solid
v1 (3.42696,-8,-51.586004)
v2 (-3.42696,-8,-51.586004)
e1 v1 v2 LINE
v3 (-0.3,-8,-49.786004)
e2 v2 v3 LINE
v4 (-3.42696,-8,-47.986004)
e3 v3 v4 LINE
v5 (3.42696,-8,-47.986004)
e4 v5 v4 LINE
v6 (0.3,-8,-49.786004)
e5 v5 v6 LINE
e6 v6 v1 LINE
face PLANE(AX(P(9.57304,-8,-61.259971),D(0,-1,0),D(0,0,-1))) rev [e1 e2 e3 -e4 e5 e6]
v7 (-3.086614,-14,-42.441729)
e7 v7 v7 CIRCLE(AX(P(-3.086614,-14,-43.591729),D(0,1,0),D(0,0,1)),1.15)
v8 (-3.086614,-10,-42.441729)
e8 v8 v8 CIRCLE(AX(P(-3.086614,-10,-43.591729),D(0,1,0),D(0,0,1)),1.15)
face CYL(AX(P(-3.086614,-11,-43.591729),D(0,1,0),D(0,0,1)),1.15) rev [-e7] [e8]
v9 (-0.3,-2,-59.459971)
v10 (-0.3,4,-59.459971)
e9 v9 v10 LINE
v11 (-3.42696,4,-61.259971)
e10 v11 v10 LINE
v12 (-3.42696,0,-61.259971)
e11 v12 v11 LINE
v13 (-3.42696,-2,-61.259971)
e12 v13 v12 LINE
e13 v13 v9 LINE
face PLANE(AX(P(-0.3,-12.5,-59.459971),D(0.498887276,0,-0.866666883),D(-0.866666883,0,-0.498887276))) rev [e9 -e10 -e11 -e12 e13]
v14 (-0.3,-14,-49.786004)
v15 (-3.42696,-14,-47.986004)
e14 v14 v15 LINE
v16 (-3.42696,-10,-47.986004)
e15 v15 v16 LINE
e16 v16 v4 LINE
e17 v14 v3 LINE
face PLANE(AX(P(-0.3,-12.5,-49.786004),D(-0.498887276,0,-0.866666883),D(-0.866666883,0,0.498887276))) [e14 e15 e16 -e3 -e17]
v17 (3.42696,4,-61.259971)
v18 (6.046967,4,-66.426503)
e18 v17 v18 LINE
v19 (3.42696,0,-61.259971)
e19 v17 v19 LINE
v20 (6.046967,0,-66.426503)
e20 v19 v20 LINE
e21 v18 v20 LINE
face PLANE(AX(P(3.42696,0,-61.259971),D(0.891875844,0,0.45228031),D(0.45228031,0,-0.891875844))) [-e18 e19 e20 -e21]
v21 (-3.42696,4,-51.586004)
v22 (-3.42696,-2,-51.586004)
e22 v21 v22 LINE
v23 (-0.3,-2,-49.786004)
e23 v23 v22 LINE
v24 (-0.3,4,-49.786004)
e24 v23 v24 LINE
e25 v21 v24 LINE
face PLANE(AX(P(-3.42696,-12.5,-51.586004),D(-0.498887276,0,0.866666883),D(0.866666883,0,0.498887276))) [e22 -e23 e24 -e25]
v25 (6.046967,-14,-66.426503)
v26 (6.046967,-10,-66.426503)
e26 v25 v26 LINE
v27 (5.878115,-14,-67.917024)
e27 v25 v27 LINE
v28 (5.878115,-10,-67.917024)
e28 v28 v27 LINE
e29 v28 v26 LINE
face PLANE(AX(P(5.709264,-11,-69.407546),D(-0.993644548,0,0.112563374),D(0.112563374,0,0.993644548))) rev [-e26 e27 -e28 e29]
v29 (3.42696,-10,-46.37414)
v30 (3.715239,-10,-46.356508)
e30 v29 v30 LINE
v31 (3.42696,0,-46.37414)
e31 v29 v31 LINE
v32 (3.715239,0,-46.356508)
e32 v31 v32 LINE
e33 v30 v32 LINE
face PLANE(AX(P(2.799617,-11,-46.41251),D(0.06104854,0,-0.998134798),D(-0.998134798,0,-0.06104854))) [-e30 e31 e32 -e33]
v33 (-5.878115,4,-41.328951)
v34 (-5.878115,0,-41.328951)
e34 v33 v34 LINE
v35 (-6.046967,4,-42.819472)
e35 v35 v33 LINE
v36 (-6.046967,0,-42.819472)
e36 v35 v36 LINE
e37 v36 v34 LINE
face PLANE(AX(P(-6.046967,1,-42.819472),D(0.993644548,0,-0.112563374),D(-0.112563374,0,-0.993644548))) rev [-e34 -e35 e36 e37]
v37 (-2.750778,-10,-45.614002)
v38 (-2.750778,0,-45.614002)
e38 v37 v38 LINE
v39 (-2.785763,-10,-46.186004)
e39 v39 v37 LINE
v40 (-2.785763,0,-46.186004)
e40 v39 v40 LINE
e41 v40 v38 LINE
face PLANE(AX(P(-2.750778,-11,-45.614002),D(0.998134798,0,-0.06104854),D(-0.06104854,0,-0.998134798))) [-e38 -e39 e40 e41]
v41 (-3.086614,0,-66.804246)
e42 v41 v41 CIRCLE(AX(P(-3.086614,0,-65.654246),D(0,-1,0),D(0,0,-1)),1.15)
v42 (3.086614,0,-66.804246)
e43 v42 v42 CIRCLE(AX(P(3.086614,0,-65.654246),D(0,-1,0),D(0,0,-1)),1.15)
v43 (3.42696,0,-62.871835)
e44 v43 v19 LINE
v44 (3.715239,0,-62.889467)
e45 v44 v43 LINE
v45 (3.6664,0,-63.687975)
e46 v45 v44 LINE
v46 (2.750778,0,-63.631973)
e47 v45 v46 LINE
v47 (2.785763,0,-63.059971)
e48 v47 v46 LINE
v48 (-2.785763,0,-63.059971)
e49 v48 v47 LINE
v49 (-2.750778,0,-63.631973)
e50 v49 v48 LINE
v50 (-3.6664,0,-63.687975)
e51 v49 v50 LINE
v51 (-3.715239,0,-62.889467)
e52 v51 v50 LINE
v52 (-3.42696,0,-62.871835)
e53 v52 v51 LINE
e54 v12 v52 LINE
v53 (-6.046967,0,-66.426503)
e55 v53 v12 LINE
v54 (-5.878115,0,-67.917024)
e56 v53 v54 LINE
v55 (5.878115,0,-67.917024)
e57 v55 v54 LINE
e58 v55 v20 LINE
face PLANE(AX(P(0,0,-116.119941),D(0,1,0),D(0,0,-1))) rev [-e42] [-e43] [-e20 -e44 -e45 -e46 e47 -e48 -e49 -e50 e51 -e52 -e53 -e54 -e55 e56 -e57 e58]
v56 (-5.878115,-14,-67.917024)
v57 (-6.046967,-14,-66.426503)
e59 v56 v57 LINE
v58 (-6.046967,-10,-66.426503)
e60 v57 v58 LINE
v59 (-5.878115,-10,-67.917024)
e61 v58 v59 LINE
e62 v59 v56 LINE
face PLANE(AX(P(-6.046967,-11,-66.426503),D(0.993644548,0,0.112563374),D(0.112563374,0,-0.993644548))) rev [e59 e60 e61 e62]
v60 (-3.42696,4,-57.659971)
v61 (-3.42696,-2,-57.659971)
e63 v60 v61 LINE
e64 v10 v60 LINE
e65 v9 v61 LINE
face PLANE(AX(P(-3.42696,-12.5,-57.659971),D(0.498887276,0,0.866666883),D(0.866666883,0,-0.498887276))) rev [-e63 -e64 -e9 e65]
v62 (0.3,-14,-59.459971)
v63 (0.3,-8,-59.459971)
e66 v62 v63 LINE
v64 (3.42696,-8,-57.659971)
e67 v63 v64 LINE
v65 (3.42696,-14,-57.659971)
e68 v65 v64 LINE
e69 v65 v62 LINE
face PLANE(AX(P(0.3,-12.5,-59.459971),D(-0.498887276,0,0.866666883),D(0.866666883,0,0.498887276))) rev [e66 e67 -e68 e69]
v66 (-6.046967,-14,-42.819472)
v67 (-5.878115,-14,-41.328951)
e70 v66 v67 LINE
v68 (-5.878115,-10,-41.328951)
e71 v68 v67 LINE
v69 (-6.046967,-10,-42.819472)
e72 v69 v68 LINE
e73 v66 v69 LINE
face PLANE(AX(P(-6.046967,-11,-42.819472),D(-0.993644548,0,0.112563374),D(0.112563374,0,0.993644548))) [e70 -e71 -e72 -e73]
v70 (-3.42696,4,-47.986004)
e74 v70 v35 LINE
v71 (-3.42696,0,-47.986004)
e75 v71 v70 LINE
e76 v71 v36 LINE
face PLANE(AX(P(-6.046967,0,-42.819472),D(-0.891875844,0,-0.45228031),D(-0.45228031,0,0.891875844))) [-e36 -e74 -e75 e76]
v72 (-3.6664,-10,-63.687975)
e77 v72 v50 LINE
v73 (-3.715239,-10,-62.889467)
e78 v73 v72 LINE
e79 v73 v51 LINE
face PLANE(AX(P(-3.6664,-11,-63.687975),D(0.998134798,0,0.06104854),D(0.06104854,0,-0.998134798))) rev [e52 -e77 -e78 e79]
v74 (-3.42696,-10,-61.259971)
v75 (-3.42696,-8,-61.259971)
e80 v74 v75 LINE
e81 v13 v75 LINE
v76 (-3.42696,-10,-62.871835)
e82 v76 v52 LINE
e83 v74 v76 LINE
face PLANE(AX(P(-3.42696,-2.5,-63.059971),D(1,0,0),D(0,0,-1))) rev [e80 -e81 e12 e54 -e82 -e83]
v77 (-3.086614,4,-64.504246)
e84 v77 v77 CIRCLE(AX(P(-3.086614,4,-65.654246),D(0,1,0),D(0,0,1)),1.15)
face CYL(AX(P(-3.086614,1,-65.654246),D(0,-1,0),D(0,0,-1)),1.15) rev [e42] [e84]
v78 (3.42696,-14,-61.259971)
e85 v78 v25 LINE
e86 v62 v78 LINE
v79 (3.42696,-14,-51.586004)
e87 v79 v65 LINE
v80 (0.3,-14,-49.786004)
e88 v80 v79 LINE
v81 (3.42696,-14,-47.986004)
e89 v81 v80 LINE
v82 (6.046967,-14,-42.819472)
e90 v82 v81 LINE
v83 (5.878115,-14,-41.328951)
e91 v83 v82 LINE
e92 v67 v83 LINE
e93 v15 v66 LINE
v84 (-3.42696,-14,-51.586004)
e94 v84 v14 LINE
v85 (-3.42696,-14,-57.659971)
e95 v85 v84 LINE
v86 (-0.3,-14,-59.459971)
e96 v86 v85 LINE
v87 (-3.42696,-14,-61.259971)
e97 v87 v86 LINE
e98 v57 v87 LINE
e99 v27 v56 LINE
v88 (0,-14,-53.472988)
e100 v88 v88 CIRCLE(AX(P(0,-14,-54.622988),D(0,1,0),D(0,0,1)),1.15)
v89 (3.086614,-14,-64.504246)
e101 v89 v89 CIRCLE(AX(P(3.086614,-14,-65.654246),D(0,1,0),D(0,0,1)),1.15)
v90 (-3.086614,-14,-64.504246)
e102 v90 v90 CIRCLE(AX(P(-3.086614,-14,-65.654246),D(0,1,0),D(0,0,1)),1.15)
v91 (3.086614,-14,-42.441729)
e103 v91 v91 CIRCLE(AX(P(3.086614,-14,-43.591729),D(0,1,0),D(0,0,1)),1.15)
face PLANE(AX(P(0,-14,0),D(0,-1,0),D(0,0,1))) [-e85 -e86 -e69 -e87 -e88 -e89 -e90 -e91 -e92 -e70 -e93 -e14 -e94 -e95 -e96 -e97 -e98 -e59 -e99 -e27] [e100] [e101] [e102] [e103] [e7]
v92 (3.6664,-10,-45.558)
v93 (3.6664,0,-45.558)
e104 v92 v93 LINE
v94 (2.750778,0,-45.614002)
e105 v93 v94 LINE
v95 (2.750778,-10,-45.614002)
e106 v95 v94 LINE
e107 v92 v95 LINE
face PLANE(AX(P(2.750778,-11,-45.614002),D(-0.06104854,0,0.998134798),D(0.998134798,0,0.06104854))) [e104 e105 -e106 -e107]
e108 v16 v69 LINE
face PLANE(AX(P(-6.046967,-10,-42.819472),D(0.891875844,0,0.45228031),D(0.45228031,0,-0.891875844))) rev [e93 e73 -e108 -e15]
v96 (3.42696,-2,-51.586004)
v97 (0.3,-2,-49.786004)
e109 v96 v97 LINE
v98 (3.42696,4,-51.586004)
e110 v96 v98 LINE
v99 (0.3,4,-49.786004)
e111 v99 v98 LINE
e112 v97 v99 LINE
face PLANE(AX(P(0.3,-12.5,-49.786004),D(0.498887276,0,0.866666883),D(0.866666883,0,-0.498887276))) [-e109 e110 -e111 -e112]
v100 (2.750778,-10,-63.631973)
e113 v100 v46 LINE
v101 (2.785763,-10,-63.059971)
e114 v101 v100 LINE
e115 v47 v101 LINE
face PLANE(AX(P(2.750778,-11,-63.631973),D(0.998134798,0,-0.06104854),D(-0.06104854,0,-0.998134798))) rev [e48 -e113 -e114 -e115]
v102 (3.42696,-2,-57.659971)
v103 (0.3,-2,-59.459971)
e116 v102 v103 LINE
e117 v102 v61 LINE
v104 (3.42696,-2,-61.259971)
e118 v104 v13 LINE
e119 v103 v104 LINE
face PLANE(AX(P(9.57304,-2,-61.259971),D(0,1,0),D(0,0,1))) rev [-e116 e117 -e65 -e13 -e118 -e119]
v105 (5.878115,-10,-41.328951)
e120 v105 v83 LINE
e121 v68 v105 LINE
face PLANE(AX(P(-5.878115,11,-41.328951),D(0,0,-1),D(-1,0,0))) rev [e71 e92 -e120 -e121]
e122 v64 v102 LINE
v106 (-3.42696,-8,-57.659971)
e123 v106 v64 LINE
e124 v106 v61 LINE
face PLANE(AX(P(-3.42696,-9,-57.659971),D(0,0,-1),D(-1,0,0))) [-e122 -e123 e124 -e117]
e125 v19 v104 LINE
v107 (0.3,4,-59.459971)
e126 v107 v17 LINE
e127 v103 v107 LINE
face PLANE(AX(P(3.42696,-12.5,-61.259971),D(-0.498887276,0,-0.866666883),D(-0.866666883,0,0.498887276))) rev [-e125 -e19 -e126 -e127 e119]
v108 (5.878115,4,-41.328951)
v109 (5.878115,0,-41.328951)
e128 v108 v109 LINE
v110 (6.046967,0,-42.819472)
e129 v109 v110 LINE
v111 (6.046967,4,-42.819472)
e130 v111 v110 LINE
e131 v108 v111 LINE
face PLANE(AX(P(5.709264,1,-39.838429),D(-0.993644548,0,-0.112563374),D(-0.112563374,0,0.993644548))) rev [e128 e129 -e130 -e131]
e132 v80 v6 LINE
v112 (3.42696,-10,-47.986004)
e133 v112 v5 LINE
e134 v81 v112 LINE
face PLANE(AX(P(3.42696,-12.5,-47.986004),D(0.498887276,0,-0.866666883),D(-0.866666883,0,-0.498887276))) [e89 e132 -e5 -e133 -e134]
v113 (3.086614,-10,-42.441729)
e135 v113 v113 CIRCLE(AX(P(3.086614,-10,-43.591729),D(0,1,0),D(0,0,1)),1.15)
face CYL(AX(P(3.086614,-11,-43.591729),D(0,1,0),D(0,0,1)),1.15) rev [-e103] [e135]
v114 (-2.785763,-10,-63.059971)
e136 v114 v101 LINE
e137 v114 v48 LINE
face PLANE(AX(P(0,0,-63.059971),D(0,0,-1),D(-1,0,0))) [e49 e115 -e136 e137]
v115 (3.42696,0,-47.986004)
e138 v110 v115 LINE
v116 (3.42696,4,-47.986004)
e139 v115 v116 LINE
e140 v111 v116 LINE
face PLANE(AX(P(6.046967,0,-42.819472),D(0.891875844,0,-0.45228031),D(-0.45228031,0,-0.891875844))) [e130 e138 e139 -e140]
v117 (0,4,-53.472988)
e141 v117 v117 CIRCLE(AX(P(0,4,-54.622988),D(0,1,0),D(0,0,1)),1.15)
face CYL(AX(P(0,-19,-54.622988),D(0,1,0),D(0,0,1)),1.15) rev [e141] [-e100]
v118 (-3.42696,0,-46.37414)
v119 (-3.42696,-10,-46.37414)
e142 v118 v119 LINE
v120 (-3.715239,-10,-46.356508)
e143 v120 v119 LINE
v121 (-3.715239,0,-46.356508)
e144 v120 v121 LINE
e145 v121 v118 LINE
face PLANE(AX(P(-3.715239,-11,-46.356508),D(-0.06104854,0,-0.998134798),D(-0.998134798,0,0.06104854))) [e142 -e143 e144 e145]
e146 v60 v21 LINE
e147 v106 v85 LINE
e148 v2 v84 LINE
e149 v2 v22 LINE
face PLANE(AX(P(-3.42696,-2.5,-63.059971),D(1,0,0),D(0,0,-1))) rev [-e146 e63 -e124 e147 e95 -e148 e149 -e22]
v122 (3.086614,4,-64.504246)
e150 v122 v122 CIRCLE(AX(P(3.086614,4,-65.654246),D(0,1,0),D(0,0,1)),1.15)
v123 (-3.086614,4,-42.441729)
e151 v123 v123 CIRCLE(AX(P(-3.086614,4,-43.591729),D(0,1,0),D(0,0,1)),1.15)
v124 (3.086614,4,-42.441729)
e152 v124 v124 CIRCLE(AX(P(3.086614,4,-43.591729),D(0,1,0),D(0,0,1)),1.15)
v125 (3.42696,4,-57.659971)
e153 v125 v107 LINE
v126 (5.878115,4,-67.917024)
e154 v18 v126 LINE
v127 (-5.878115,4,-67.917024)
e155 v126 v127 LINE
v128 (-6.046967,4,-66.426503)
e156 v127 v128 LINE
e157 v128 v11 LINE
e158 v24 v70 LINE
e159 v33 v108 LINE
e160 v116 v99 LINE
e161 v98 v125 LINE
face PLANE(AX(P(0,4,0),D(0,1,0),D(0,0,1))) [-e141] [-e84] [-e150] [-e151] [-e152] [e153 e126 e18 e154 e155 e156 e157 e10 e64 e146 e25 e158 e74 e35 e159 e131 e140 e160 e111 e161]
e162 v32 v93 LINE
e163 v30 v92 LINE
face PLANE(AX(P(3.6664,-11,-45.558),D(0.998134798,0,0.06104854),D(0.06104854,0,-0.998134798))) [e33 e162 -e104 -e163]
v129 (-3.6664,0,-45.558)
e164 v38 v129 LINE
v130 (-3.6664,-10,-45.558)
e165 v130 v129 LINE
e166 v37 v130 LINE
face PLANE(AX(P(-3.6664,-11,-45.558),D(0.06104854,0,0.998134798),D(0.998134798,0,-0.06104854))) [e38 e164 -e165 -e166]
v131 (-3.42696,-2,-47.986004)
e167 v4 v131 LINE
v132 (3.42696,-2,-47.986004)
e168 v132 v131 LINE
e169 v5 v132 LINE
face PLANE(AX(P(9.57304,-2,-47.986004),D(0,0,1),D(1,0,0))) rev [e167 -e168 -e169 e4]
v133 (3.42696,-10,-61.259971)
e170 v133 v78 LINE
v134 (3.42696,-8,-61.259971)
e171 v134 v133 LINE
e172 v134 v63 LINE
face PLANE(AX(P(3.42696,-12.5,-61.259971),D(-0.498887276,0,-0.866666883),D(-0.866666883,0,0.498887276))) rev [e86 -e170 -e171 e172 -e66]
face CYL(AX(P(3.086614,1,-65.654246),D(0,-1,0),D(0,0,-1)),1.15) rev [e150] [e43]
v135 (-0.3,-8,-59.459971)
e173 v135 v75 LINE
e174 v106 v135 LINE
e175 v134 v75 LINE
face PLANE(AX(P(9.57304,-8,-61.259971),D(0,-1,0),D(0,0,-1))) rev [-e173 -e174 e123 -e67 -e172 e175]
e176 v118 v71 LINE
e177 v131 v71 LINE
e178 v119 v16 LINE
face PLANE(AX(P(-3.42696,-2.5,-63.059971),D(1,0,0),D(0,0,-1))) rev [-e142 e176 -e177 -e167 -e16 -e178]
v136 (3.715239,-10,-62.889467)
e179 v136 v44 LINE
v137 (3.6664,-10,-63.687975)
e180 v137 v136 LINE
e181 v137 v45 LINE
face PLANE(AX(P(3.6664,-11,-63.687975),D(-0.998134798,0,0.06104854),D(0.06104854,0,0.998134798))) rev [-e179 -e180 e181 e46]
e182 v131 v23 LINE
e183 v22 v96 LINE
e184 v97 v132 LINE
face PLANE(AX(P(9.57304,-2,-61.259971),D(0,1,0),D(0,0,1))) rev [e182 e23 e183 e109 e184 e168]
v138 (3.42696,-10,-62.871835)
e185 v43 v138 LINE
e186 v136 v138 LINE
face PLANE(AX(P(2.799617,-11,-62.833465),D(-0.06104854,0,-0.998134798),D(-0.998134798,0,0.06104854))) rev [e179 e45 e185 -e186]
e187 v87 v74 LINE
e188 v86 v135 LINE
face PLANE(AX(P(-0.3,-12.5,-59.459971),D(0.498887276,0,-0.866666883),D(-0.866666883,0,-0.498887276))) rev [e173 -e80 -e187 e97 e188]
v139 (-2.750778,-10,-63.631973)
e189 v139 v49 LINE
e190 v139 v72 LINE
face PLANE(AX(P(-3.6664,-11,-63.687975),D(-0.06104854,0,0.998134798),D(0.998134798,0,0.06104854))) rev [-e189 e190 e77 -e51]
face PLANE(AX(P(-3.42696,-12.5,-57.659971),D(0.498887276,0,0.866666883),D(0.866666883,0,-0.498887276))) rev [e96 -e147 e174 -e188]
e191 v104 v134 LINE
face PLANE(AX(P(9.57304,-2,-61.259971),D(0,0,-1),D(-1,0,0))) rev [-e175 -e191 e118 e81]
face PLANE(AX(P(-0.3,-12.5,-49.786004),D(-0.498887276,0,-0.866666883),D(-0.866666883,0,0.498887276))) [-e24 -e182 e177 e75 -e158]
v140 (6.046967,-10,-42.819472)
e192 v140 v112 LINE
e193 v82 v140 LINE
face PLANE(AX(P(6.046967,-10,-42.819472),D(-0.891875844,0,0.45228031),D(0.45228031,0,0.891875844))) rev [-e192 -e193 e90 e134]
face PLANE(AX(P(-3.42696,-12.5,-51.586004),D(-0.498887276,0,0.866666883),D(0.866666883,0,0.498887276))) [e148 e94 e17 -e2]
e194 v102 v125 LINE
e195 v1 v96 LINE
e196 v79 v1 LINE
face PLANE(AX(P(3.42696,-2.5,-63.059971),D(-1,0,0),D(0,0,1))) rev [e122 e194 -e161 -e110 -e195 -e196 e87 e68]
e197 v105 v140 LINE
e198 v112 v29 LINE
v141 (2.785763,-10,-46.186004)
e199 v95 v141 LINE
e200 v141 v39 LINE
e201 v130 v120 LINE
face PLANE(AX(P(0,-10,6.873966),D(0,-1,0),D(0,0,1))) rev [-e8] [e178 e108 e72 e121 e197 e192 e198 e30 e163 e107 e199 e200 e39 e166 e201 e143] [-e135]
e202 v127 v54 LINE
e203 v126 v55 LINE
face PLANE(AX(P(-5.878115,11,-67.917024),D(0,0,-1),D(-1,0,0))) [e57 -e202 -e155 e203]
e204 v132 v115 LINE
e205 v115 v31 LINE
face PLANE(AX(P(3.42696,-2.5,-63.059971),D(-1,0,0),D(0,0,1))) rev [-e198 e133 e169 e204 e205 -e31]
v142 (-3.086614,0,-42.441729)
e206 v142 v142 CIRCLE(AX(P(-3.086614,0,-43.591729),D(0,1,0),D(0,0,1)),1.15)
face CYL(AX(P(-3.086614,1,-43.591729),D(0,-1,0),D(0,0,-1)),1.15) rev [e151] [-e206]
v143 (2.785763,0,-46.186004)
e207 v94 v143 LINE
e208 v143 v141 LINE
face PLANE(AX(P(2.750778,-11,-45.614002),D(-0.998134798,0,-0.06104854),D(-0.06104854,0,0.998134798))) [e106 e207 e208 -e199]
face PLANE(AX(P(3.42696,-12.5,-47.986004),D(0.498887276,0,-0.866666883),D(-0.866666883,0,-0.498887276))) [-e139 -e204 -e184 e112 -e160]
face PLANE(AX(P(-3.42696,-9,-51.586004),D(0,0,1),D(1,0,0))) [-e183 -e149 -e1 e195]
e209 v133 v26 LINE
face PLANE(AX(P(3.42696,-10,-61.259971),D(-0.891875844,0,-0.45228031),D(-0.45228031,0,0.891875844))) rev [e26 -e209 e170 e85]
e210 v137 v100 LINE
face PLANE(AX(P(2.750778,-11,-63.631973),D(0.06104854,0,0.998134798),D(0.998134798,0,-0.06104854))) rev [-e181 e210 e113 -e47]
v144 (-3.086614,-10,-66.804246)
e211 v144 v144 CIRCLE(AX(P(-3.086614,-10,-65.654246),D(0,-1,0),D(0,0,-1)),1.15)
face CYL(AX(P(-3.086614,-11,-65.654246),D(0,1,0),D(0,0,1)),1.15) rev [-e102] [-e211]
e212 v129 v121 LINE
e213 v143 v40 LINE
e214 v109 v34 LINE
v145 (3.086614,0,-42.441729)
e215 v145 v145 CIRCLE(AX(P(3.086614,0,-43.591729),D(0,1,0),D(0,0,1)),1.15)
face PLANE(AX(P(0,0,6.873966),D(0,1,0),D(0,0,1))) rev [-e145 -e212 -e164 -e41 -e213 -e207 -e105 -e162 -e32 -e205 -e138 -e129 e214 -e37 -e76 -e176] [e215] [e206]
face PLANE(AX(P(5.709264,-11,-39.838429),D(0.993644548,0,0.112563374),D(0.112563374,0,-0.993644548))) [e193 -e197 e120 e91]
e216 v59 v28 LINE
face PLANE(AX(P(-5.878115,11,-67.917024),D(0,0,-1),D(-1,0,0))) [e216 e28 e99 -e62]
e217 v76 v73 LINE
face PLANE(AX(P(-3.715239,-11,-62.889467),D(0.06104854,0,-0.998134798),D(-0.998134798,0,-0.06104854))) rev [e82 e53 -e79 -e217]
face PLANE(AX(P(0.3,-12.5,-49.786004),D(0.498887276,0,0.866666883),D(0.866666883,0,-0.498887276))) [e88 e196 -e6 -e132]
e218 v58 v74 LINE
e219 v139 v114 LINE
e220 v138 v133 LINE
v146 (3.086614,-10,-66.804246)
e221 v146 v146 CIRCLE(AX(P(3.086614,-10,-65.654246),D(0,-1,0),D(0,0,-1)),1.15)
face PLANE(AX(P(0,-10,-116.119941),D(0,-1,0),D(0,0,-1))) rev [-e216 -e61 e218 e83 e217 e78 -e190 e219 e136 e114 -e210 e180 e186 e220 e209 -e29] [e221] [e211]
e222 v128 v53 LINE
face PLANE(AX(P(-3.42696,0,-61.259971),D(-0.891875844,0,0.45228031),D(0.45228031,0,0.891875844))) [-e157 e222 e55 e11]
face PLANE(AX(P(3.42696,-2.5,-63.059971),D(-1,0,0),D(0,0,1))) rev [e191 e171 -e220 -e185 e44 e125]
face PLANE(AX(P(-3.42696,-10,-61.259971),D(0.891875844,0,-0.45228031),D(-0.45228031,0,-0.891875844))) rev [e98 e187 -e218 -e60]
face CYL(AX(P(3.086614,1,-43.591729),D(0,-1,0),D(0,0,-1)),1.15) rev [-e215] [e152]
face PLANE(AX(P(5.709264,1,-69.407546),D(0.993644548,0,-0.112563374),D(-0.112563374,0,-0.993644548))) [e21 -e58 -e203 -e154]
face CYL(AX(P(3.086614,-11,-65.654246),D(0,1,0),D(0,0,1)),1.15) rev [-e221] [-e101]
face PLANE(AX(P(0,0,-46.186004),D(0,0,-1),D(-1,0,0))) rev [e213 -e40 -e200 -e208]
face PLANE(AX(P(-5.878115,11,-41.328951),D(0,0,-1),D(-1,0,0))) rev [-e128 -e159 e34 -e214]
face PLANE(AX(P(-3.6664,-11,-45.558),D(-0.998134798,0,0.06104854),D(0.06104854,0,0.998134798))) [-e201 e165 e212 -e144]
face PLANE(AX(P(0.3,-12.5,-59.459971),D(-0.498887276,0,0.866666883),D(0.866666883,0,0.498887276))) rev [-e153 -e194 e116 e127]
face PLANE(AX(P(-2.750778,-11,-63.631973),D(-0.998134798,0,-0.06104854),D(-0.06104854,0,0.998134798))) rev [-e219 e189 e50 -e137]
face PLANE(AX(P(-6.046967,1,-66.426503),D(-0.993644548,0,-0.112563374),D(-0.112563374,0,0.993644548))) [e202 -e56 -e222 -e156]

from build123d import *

# Parameters (mm, degrees)
SKETCH1_R            = 1.15
BOSS_EXTRUDE1_DEPTH  = 1
BOSS_EXTRUDE2_DEPTH  = 12
BOSS_EXTRUDE3_DEPTH  = 12
SKETCH6_W            = 6.853919328
SKETCH6_H            = 5
BOSS_EXTRUDE4_DEPTH  = 10
MIRROR2_START        = -11
MIRROR2_OUTLINE_R    = 1.15
MIRROR2_DEPTH        = 1
MIRROR2_START_2      = -10
MIRROR2_2_DEPTH      = 11
SKETCH7_W            = 11.75623079
SKETCH7_H            = 5.445993007
CUT_EXTRUDE1_DEPTH   = 22
SKETCH15_W           = 6.853919328
SKETCH15_H           = 5
BOSS_EXTRUDE8_DEPTH  = 6.873966159
CUT_EXTRUDE6_DEPTH   = 10
BOSS_EXTRUDE9_DEPTH  = 3.5
SKETCH19_R           = 1.15
CUT_EXTRUDE2_DEPTH   = 20
BOSS_EXTRUDE10_DEPTH = 1
BOSS_EXTRUDE11_START = 3
SKETCH27_R           = 1.15
BOSS_EXTRUDE11_DEPTH = 3
SKETCH28_W           = 13.273966158
SKETCH28_H           = 6
CUT_EXTRUDE7_DEPTH   = 13
SKETCH29_W           = 6.853919328
SKETCH29_H           = 6.073966158
SKETCH29_R           = 1.15
BOSS_EXTRUDE12_DEPTH = 13
BOSS_EXTRUDE13_DEPTH = 4


with BuildPart() as part:
    # Sketch1 → Boss-Extrude1 (new body)
    with BuildSketch(Plane(origin=(0, 0, 0), x_dir=(1, 0, 0), z_dir=(0, 1, 0))):
        Polygon((-6.046966624, 49.693438145), (-5.709264166, 46.7123956), (-3.10834847, 44.45145408), (-2.33209021, 44.498932069), (-0.026100804, 47.059992762), (0.026100804, 47.059992762), (2.33209021, 44.498932069), (3.10834847, 44.45145408), (5.709264166, 46.7123956), (6.046966624, 49.693438145), (3.66640026, 52.431966482), (2.75077786, 52.487968347), (0.054213226, 50.059970644), (-0.054213226, 50.059970644), (-2.75077786, 52.487968347), (-3.66640026, 52.431966482), align=None)
        with Locations(Location((-3.086614159, 50.465695408, 0), (0, 0, 270))):
            Circle(SKETCH1_R, mode=Mode.SUBTRACT)
        with Locations(Location((3.086614159, 50.465695408, 0), (0, 0, 270))):
            Circle(SKETCH1_R, mode=Mode.SUBTRACT)
        with Locations(Location((2.842648162, 46.476886618, 0), (0, 0, 270))):
            Circle(SKETCH1_R, mode=Mode.SUBTRACT)
        with Locations(Location((-2.842648162, 46.476886618, 0), (0, 0, 270))):
            Circle(SKETCH1_R, mode=Mode.SUBTRACT)
    boss_extrude1 = extrude(amount=BOSS_EXTRUDE1_DEPTH)

    # Sketch2 → Boss-Extrude2 (add)
    with BuildSketch(Plane(origin=(0, 1, 0), x_dir=(1, 0, 0), z_dir=(0, 1, 0))):
        Polygon((-3.66640026, 52.431966482), (-2.75077786, 52.487968347), (-2.799616692, 53.286476185), (-3.715239092, 53.23047432), align=None)
        Polygon((2.75077786, 52.487968347), (3.66640026, 52.431966482), (3.715239092, 53.23047432), (2.799616692, 53.286476185), align=None)
    extrude(amount=-BOSS_EXTRUDE2_DEPTH)

    # Mirror1: Boss-Extrude1 across plane
    add(boss_extrude1.mirror(Plane.ZX.offset(-5)))

    # Sketch3 → Boss-Extrude3 (add)
    with BuildSketch(Plane(origin=(0, 1, 0), x_dir=(1, 0, 0), z_dir=(0, 1, 0))):
        Polygon((2.33209021, 44.498932069), (3.10834847, 44.45145408), (3.059509638, 43.652946241), (2.283251379, 43.70042423), align=None)
        Polygon((-2.33209021, 44.498932069), (-3.10834847, 44.45145408), (-3.059509638, 43.652946241), (-2.283251379, 43.70042423), align=None)
    extrude(amount=-BOSS_EXTRUDE3_DEPTH)

    # Sketch6 → Boss-Extrude4 (add)
    with BuildSketch(Plane(origin=(0, 0, -53.059970644), x_dir=(-1, 0, 0), z_dir=(0, 0, -1))):
        with Locations((0, -5)):
            Rectangle(SKETCH6_W, SKETCH6_H)
    extrude(amount=BOSS_EXTRUDE4_DEPTH)



with BuildPart() as body_2:
    # Mirror2: read off the stored shape, not the designer's step
    # Mirror2 outline → Mirror2 (new body)
    with BuildSketch(Plane(origin=(0, 0, 0), x_dir=(1, 0, 0), z_dir=(0, 1, 0)).offset(MIRROR2_START)):
        Polygon((-3.715239092, 62.889466969), (-2.799616692, 62.833465104), (-2.75077786, 63.631972942), (-0.054213226, 66.059970644), (0.054213226, 66.059970644), (2.75077786, 63.631972942), (2.799616692, 62.833465104), (3.715239092, 62.889466969), (3.66640026, 63.687974807), (6.046966624, 66.426503144), (5.709264166, 69.407545689), (3.10834847, 71.668487209), (3.059509638, 72.466995048), (2.283251379, 72.419517059), (2.33209021, 71.62100922), (0.026100804, 69.059948527), (-0.026100804, 69.059948527), (-2.33209021, 71.62100922), (-2.283251379, 72.419517059), (-3.059509638, 72.466995048), (-3.10834847, 71.668487209), (-5.709264166, 69.407545689), (-6.046966624, 66.426503144), (-3.66640026, 63.687974807), align=None)
        with Locations((2.842648162, 69.643054671)):
            Circle(MIRROR2_OUTLINE_R, mode=Mode.SUBTRACT)
        with Locations((-3.086614159, 65.654245881)):
            Circle(MIRROR2_OUTLINE_R, mode=Mode.SUBTRACT)
        with Locations((3.086614159, 65.654245881)):
            Circle(MIRROR2_OUTLINE_R, mode=Mode.SUBTRACT)
        with Locations((-2.842648162, 69.643054671)):
            Circle(MIRROR2_OUTLINE_R, mode=Mode.SUBTRACT)
    mirror2 = extrude(amount=MIRROR2_DEPTH)


with BuildPart() as part_1:
    add(part.part)

    add(body_2.part)  # Mirror2 2 merges body 2
    # Mirror2 2 outline → Mirror2 2 (add)
    with BuildSketch(Plane(origin=(0, 0, 0), x_dir=(1, 0, 0), z_dir=(0, 1, 0)).offset(MIRROR2_START_2)):
        Polygon((-3.715239092, 62.889466969), (-2.799616692, 62.833465104), (-2.75077786, 63.631972942), (-3.66640026, 63.687974807), align=None)
        Polygon((3.66640026, 63.687974807), (2.75077786, 63.631972942), (2.799616692, 62.833465104), (3.715239092, 62.889466969), align=None)
        Polygon((-3.059509638, 72.466995048), (-3.10834847, 71.668487209), (-2.33209021, 71.62100922), (-2.283251379, 72.419517059), align=None)
        Polygon((2.33209021, 71.62100922), (3.10834847, 71.668487209), (3.059509638, 72.466995048), (2.283251379, 72.419517059), align=None)
    mirror2_2 = extrude(amount=MIRROR2_2_DEPTH)

    # Mirror3: Mirror2, Mirror2 2 across plane
    add(mirror2.mirror(Plane.ZX.offset(-5)))
    add(mirror2_2.mirror(Plane.ZX.offset(-5)))

    # Sketch7 → Cut-Extrude1 (cut)
    with BuildSketch(Plane.XZ.offset(11)):
        with Locations((0, -45.479920369)):
            Rectangle(SKETCH7_W, SKETCH7_H)
    cut_extrude1 = extrude(amount=-CUT_EXTRUDE1_DEPTH, mode=Mode.SUBTRACT)

    # Mirror4: Cut-Extrude1 across plane
    add(cut_extrude1.mirror(Plane.XY.offset(-58.059970644)), mode=Mode.SUBTRACT)


with BuildPart() as body_2_2:
    # Split1: the piece on the far side of the plane
    add(part_1.part)
    split(bisect_by=Plane.XY.offset(-58.059970644), keep=Keep.BOTTOM)


with BuildPart() as part_2:
    add(part_1.part)

    # Split1
    split(bisect_by=Plane.XY.offset(-58.059970644), keep=Keep.TOP)


with BuildPart() as part_3:
    # Body-Move/Copy1: moved
    add(part_2.part.moved(Location((0, 0, 6.873966159))))


with BuildPart() as part_4:
    # Body-Move/Copy2: moved
    add(part_3.part.moved(Location((20.680073688, 0, 0))))


with BuildPart() as part_5:
    # Body-Move/Copy4: read off the stored shape, not the designer's step
    # Body-Move/Copy4: moved
    add(part_4.part.moved(Location((-20.6800737, 0, 0))))


    add(body_2_2.part)  # Boss-Extrude8 merges body 2 2
    # Sketch15 → Boss-Extrude8 (add)
    with BuildSketch(Plane.XY.offset(-58.059970644)):
        with Locations((0, -5)):
            Rectangle(SKETCH15_W, SKETCH15_H)
    extrude(amount=BOSS_EXTRUDE8_DEPTH)

    # Sketch24 → Cut-Extrude6 (cut)
    with BuildSketch(Plane(origin=(0, -2.5, 0), x_dir=(1, 0, 0), z_dir=(0, 1, 0))):
        Polygon((-3.426959664, 61.259970644), (-3.426959664, 57.659970644), (-0.3, 59.459970644), align=None)
        Polygon((3.426959664, 61.259970644), (0.3, 59.459970644), (3.426959664, 57.659970644), align=None)
    cut_extrude6 = extrude(amount=-CUT_EXTRUDE6_DEPTH, mode=Mode.SUBTRACT)

    # Mirror8: Cut-Extrude6 across plane
    add(cut_extrude6.mirror(Plane.XY.offset(-54.622987565)), mode=Mode.SUBTRACT)

    # Sketch25 → Boss-Extrude9 (add)
    with BuildSketch(Plane(origin=(0, -2.5, 0), x_dir=(1, 0, 0), z_dir=(0, 1, 0))):
        Polygon((-3.426959664, 63.059970644), (-3.426959664, 61.259970644), (-0.3, 59.459970644), (-3.426959664, 57.659970644), (-3.426959664, 51.586004486), (-0.3, 49.786004486), (-3.426959664, 47.986004486), (-3.426959664, 46.186004486), (3.426959664, 46.186004486), (3.426959664, 47.986004486), (0.3, 49.786004486), (3.426959664, 51.586004486), (3.426959664, 57.659970644), (0.3, 59.459970644), (3.426959664, 61.259970644), (3.426959664, 63.059970644), align=None)
    boss_extrude9 = extrude(amount=BOSS_EXTRUDE9_DEPTH)

    # Mirror10: Boss-Extrude9 across plane
    add(boss_extrude9.mirror(Plane.ZX.offset(-5)))

    # Sketch19 → Cut-Extrude2 (cut)
    with BuildSketch(Plane(origin=(0, 1, 0), x_dir=(1, 0, 0), z_dir=(0, 1, 0))):
        with Locations(Location((0, 54.622987565, 0), (0, 0, 270))):
            Circle(SKETCH19_R)
    extrude(amount=-CUT_EXTRUDE2_DEPTH, mode=Mode.SUBTRACT)

    # Sketch26 → Boss-Extrude10 (add)
    with BuildSketch(Plane(origin=(0, 1, 0), x_dir=(1, 0, 0), z_dir=(0, 1, 0))):
        Polygon((-0.054213226, 66.059970644), (0.054213226, 66.059970644), (2.75077786, 63.631972942), (2.785763019, 63.059970644), (-2.785763019, 63.059970644), (-2.75077786, 63.631972942), align=None)
        Polygon((-2.785763019, 46.186004486), (2.785763019, 46.186004486), (2.75077786, 45.614002188), (0.054213226, 43.186004486), (-0.054213226, 43.186004486), (-2.75077786, 45.614002188), align=None)
    boss_extrude10 = extrude(amount=-BOSS_EXTRUDE10_DEPTH)

    # Mirror11: Boss-Extrude10 across plane
    add(boss_extrude10.mirror(Plane.ZX.offset(-5)))

    # Sketch27 → Boss-Extrude11 (add)
    with BuildSketch(Plane(origin=(0, 1, 0), x_dir=(1, 0, 0), z_dir=(0, 1, 0)).offset(BOSS_EXTRUDE11_START)):
        Polygon((-5.878115395, 67.917024417), (-6.046966624, 66.426503144), (-3.66640026, 63.687974807), (-3.715239092, 62.889466969), (-3.426959664, 62.871835043), (-3.426959664, 61.259970644), (-0.3, 59.459970644), (-3.426959664, 57.659970644), (-3.426959664, 51.586004486), (-0.3, 49.786004486), (-3.426959664, 47.986004486), (-3.426959664, 46.374140087), (-3.715239092, 46.356508162), (-3.66640026, 45.558000323), (-6.046966624, 42.819471986), (-5.878115395, 41.328950714), (5.878115395, 41.328950714), (6.046966624, 42.819471986), (3.66640026, 45.558000323), (3.715239092, 46.356508162), (3.426959664, 46.374140087), (3.426959664, 47.986004486), (0.3, 49.786004486), (3.426959664, 51.586004486), (3.426959664, 57.659970644), (0.3, 59.459970644), (3.426959664, 61.259970644), (3.426959664, 62.871835043), (3.715239092, 62.889466969), (3.66640026, 63.687974807), (6.046966624, 66.426503144), (5.878115395, 67.917024417), align=None)
        with Locations(Location((-3.086614159, 65.654245881, 0), (0, 0, 90))):
            Circle(SKETCH27_R, mode=Mode.SUBTRACT)
        with Locations(Location((3.086614159, 65.654245881, 0), (0, 0, 90))):
            Circle(SKETCH27_R, mode=Mode.SUBTRACT)
        with Locations(Location((0, 54.622987565, 0), (0, 0, 270))):
            Circle(SKETCH27_R, mode=Mode.SUBTRACT)
        with Locations(Location((-3.086614159, 43.59172925, 0), (0, 0, 270))):
            Circle(SKETCH27_R, mode=Mode.SUBTRACT)
        with Locations(Location((3.086614159, 43.59172925, 0), (0, 0, 270))):
            Circle(SKETCH27_R, mode=Mode.SUBTRACT)
    boss_extrude11 = extrude(amount=-BOSS_EXTRUDE11_DEPTH)

    # Mirror12: Boss-Extrude11 across plane
    add(boss_extrude11.mirror(Plane.ZX.offset(-5)))

    # Sketch28 → Cut-Extrude7 (cut)
    with BuildSketch(Plane.ZY.offset(3.426959664)):
        with Locations((-54.622987565, -5)):
            Rectangle(SKETCH28_W, SKETCH28_H)
    extrude(amount=-CUT_EXTRUDE7_DEPTH, mode=Mode.SUBTRACT)

    # Sketch29 → Boss-Extrude12 (add)
    with BuildSketch(Plane(origin=(0, 4, 0), x_dir=(1, 0, 0), z_dir=(0, 1, 0))):
        with Locations((0, 54.622987565)):
            Rectangle(SKETCH29_W, SKETCH29_H)
        with Locations(Location((0, 54.622987565, 0), (0, 0, 270))):
            Circle(SKETCH29_R, mode=Mode.SUBTRACT)
    extrude(amount=-BOSS_EXTRUDE12_DEPTH)

    # Sketch30 → Boss-Extrude13 (add)
    with BuildSketch(Plane(origin=(0, 4, 0), x_dir=(1, 0, 0), z_dir=(0, 1, 0))):
        Polygon((3.426959664, 61.259970644), (6.046966624, 66.426503144), (3.66640026, 63.687974807), (3.715239092, 62.889466969), (3.426959664, 62.871835043), align=None)
        Polygon((-6.046966624, 66.426503144), (-3.66640026, 63.687974807), (-3.715239092, 62.889466969), (-3.426959664, 62.871835043), (-3.426959664, 61.259970644), align=None)
        Polygon((3.426959664, 47.986004486), (3.426959664, 46.374140087), (3.715239092, 46.356508162), (3.66640026, 45.558000323), (6.046966624, 42.819471986), align=None)
        Polygon((-3.426959664, 47.986004486), (-3.426959664, 46.374140087), (-3.715239092, 46.356508162), (-3.66640026, 45.558000323), (-6.046966624, 42.819471986), align=None)
    boss_extrude13 = extrude(amount=-BOSS_EXTRUDE13_DEPTH)

    # Mirror13: Boss-Extrude13 across plane
    add(boss_extrude13.mirror(Plane.ZX.offset(-5)))


solid = part_5.part
